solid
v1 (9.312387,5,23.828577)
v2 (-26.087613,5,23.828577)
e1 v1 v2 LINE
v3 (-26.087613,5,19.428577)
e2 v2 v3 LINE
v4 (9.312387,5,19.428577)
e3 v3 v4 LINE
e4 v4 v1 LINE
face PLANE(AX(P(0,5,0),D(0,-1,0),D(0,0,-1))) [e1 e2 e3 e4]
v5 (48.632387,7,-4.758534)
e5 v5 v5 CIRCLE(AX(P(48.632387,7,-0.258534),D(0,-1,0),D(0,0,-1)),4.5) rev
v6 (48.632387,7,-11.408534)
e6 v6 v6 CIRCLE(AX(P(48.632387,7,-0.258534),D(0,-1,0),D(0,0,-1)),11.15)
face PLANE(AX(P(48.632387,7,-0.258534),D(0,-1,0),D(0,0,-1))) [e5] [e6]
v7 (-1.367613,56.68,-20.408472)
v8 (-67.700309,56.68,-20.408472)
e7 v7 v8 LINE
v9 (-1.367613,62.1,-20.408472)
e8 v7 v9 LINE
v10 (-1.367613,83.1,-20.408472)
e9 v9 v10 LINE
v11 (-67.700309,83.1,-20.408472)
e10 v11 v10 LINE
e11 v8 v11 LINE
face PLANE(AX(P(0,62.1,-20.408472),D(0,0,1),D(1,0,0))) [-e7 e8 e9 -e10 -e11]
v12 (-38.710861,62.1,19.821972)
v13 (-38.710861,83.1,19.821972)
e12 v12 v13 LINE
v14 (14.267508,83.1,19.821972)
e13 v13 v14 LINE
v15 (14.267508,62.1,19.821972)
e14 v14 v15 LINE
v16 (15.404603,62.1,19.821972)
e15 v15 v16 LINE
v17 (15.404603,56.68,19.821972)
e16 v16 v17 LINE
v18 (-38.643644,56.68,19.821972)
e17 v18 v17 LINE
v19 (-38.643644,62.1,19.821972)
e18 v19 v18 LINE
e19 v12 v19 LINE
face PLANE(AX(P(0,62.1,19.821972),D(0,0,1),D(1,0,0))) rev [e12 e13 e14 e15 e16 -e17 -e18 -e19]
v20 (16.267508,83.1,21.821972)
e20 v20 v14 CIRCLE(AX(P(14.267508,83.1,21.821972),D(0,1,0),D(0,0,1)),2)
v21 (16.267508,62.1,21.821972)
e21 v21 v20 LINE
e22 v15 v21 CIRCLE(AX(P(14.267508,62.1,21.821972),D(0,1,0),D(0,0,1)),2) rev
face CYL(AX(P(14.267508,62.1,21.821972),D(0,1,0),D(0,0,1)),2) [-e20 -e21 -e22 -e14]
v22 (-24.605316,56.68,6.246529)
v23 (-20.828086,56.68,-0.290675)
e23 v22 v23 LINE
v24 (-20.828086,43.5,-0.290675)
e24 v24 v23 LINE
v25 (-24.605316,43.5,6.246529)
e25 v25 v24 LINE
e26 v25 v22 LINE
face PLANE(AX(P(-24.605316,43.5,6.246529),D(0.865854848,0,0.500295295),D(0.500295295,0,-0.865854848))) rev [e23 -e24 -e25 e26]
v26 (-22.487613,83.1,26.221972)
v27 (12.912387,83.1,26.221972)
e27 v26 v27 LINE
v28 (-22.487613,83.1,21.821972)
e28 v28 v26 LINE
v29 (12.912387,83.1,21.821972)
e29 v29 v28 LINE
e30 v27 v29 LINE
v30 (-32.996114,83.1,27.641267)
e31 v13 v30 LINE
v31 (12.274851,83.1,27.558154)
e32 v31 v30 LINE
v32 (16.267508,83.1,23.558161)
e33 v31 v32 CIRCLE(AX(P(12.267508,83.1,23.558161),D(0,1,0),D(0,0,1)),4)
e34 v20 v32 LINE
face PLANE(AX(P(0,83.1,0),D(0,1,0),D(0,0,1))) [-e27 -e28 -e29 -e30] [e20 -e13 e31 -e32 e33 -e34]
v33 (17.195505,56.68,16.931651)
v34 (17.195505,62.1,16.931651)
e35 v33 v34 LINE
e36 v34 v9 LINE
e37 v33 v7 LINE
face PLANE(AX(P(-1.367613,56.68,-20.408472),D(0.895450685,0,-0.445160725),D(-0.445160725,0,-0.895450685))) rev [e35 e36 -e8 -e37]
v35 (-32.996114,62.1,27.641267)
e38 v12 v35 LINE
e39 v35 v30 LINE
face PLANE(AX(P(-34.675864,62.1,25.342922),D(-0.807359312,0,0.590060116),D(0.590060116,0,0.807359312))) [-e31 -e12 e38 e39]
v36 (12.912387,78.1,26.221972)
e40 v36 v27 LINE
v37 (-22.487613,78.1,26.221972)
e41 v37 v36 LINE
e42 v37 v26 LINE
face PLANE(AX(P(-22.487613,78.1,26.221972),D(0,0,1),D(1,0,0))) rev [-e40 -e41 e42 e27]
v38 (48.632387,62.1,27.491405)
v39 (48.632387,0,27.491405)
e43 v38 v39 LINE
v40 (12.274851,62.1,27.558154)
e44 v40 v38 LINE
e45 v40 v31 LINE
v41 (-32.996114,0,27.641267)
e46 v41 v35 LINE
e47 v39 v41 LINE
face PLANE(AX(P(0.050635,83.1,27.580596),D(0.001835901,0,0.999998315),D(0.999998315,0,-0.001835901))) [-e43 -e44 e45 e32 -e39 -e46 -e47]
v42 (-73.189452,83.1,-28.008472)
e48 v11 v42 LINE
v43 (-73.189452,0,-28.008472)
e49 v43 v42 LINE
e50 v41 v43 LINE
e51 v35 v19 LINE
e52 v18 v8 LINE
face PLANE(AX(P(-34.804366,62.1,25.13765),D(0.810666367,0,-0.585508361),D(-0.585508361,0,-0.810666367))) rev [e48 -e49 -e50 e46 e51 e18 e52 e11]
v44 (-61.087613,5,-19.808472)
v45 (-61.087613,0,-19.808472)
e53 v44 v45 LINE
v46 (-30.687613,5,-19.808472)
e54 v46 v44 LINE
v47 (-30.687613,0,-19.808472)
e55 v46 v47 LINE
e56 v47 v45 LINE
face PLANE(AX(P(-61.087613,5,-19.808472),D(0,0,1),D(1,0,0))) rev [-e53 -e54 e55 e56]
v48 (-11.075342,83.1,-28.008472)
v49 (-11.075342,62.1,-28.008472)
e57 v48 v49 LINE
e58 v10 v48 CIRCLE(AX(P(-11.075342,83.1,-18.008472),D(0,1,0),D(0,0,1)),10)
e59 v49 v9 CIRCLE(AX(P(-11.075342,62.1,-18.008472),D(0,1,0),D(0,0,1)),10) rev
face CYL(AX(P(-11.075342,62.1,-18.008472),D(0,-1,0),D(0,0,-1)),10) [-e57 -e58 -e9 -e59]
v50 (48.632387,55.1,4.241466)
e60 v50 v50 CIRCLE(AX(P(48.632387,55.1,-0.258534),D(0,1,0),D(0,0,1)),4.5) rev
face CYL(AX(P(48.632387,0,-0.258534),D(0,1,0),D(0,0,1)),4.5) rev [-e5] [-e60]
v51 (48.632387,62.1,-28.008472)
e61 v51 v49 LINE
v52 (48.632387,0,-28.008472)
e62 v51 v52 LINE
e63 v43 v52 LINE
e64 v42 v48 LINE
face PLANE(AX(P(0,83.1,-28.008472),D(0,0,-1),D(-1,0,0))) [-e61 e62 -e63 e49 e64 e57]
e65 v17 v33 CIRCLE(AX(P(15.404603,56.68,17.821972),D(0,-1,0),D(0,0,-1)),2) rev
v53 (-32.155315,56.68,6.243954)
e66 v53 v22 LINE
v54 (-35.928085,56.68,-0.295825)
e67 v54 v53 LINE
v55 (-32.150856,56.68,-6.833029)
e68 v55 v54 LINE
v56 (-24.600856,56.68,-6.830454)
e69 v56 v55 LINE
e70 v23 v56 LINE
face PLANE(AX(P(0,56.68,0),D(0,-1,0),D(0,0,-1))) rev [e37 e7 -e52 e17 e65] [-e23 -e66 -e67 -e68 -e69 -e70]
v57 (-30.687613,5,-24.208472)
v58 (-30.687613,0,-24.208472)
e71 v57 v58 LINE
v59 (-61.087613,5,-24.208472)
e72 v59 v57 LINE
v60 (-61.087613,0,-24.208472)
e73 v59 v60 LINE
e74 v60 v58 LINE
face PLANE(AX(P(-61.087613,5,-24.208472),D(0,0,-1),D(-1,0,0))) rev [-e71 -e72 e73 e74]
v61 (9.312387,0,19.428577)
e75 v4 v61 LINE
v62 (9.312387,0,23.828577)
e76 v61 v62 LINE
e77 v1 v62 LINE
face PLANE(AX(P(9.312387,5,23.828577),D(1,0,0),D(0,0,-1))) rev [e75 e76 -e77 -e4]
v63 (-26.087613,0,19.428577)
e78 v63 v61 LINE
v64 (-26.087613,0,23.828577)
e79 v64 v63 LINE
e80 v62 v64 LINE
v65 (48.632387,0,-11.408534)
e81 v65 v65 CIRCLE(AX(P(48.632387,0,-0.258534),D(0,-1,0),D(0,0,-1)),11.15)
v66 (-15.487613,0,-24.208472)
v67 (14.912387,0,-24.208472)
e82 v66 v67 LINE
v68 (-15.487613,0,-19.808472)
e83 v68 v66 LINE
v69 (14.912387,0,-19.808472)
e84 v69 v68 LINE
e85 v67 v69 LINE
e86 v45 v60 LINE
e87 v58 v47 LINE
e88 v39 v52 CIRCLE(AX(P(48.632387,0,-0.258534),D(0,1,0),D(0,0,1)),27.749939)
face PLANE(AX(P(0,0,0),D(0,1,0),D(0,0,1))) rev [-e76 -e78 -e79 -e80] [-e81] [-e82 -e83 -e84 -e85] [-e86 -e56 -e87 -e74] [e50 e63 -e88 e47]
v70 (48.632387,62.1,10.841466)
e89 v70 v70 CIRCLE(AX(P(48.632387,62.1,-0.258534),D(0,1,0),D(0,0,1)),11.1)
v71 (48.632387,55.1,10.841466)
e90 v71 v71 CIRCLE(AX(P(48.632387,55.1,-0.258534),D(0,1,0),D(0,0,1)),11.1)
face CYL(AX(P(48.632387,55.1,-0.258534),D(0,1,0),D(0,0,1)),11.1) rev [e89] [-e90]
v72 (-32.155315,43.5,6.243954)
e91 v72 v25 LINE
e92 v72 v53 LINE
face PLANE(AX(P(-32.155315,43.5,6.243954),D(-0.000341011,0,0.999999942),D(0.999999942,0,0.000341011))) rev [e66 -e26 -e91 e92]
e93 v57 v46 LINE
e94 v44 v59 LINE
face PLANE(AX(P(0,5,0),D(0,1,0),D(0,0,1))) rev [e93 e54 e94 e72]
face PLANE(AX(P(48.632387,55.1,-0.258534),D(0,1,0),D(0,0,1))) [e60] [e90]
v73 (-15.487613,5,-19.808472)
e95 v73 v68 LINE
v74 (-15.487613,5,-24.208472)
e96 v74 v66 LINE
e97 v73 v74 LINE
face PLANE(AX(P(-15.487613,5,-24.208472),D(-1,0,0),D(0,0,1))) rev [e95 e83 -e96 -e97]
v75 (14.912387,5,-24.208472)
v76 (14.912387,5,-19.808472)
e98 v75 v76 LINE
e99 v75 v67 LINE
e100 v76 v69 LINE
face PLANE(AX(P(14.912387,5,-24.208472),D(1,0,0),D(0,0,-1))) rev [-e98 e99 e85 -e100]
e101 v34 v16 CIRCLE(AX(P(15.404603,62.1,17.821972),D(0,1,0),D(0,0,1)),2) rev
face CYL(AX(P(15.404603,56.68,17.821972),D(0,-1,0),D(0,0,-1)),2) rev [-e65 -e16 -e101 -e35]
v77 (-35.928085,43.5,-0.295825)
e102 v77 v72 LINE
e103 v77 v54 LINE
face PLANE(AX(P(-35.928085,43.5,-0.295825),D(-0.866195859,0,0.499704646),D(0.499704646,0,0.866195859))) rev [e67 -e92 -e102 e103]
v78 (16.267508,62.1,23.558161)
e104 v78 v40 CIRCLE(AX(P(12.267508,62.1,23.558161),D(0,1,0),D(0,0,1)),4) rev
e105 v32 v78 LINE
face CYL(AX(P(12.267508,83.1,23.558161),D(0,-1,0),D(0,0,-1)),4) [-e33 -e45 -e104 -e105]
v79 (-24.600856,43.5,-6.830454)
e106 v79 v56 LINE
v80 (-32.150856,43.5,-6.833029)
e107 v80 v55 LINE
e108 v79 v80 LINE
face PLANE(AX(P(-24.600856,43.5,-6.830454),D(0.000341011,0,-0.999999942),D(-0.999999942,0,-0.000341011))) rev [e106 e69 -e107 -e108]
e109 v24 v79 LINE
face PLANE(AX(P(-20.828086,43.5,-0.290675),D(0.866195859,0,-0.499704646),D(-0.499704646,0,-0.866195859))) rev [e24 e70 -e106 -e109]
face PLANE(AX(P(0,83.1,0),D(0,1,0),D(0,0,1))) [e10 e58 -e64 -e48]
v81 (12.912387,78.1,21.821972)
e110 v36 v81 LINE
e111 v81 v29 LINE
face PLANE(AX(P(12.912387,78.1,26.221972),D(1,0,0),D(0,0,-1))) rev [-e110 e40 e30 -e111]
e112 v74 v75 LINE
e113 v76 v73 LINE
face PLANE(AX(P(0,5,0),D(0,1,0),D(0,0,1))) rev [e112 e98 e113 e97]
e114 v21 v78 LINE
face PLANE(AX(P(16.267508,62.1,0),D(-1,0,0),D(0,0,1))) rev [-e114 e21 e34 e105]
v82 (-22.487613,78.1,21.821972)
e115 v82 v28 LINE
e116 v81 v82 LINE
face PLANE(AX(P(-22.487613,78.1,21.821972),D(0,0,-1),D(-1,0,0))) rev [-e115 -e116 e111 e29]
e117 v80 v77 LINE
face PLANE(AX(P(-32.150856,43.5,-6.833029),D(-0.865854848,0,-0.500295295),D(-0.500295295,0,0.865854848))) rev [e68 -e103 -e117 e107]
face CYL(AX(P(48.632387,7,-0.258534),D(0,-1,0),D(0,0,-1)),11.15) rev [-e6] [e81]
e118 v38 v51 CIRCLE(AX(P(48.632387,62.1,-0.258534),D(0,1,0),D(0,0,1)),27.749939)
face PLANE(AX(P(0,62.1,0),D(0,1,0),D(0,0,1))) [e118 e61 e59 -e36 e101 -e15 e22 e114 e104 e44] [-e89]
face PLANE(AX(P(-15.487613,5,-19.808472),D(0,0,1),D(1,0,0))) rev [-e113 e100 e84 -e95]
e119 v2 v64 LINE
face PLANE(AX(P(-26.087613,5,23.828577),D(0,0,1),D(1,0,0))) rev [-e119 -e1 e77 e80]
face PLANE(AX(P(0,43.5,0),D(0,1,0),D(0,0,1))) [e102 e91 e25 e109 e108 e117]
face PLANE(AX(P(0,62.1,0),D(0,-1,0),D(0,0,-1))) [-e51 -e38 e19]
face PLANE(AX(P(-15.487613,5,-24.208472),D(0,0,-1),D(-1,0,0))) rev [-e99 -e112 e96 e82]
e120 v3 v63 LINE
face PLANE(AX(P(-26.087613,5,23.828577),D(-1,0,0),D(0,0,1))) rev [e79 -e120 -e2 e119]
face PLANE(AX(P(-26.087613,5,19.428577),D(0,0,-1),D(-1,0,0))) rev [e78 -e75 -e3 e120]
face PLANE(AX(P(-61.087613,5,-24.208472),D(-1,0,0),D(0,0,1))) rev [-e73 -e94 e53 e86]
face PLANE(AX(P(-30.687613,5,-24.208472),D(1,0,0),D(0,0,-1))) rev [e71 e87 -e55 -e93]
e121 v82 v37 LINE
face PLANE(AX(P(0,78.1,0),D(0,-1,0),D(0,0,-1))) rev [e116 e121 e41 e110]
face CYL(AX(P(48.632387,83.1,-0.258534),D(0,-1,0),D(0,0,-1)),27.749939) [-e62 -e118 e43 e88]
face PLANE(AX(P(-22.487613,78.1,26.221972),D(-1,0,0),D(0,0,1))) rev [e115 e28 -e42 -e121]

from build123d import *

# Parameters (mm, degrees)
EXTRUDE_1_DEPTH      = 83.1
SKETCH_2_W           = 35.4
SKETCH_2_H           = 4.4
SKETCH_2_W_2         = 30.4
CUT_EXTRUDE_1_DEPTH  = 5
SKETCH_3_W           = 35.4
SKETCH_3_H           = 4.4
CUT_EXTRUDE_2_DEPTH  = 5
CUT_EXTRUDE_4_DEPTH  = 21
SKETCH_7_R           = 4.5
CUT_EXTRUDE_5_DEPTH  = 107.120558328
SKETCH_8_R           = 11.1
CUT_EXTRUDE_6_DEPTH  = 7
SKETCH_9_R           = 11.15
CUT_EXTRUDE_7_DEPTH  = 7
CUT_EXTRUDE_8_DEPTH  = 107.120558328
FILLET_1_R           = 10
CUT_EXTRUDE_9_DEPTH  = 18.6
CUT_EXTRUDE_10_DEPTH = 5.42
FILLET_2_R           = 2
FILLET_3_R           = 2
FILLET_4_R           = 4


with BuildPart() as part:
    # Эскиз1 → Бобышка-Вытянуть1 (new body)
    with BuildSketch(Plane(origin=(0, 0, 0), x_dir=(1, 0, 0), z_dir=(0, 1, 0))):
        with BuildLine():
            Line((48.631682576, -27.49140627), (48.632387335, -27.491404976))
            ThreePointArc((48.632387335, -27.491404976), (76.382325871, 0.258533559), (48.632387335, 28.008472095))
            Line((48.632387335, 28.008472095), (-81.367612665, 28.008472095))
            Line((-81.367612665, 28.008472095), (-81.367612665, -27.730072458))
            Line((-81.367612665, -27.730072458), (48.631682576, -27.49140627))
        make_face()
    extrude(amount=EXTRUDE_1_DEPTH)

    # Эскиз2 → Вырез-Вытянуть1 (cut)
    with BuildSketch(Plane(origin=(0, 0, 0), x_dir=(-1, 0, 0), z_dir=(0, -1, 0))):
        with Locations((8.387612665, -21.628577297)):
            Rectangle(SKETCH_2_W, SKETCH_2_H)
        with Locations((45.887612665, 22.008472095)):
            Rectangle(SKETCH_2_W_2, SKETCH_2_H)
        with Locations((0.287612665, 22.008472095)):
            Rectangle(SKETCH_2_W_2, SKETCH_2_H)
    extrude(amount=-CUT_EXTRUDE_1_DEPTH, mode=Mode.SUBTRACT)

    # Эскиз3 → Вырез-Вытянуть2 (cut)
    with BuildSketch(Plane(origin=(0, 83.1, 0), x_dir=(1, 0, 0), z_dir=(0, 1, 0))):
        with Locations((-4.787612665, -24.021972088)):
            Rectangle(SKETCH_3_W, SKETCH_3_H)
    extrude(amount=-CUT_EXTRUDE_2_DEPTH, mode=Mode.SUBTRACT)

    # Эскиз6 → Вырез-Вытянуть4 (cut)
    with BuildSketch(Plane(origin=(0, 83.1, 0), x_dir=(1, 0, 0), z_dir=(0, 1, 0))):
        with BuildLine():
            Line((-38.710860793, -19.821972088), (16.267507788, -19.821972088))
            Line((16.267507788, -19.821972088), (16.267507788, -27.550823779))
            Line((16.267507788, -27.550823779), (37.284075999, -27.512239383))
            ThreePointArc((37.284075999, -27.512239383), (78.632374752, 0.286010542), (37.233224591, 28.008472095))
            Line((37.233224591, 28.008472095), (-1.367612665, 28.008472095))
            Line((-1.367612665, 28.008472095), (-1.367612665, 20.408472095))
            Line((-1.367612665, 20.408472095), (-67.700309337, 20.408472095))
            Line((-67.700309337, 20.408472095), (-73.189452249, 28.008472095))
            Line((-73.189452249, 28.008472095), (-81.367612665, 28.008472095))
            Line((-81.367612665, 28.008472095), (-81.367612665, -27.730072458))
            Line((-81.367612665, -27.730072458), (-32.996113938, -27.641267044))
            Line((-32.996113938, -27.641267044), (-38.710860793, -19.821972088))
        make_face()
    extrude(amount=-CUT_EXTRUDE_4_DEPTH, mode=Mode.SUBTRACT)

    # Эскиз7 → Вырез-Вытянуть5 (cut, through all)
    with BuildSketch(Plane(origin=(0, 62.1, 0), x_dir=(1, 0, 0), z_dir=(0, 1, 0))):
        with Locations(Location((48.632387335, 0.258533559, 0), (0, 0, 270))):
            Circle(SKETCH_7_R)
    extrude(amount=-CUT_EXTRUDE_5_DEPTH, mode=Mode.SUBTRACT)

    # Эскиз8 → Вырез-Вытянуть6 (cut)
    with BuildSketch(Plane(origin=(0, 62.1, 0), x_dir=(1, 0, 0), z_dir=(0, 1, 0))):
        with Locations(Location((48.632387335, 0.258533559, 0), (0, 0, 270))):
            Circle(SKETCH_8_R)
    extrude(amount=-CUT_EXTRUDE_6_DEPTH, mode=Mode.SUBTRACT)

    # Эскиз9 → Вырез-Вытянуть7 (cut)
    with BuildSketch(Plane.XZ):
        with Locations(Location((48.632387335, -0.258533559, 0), (0, 0, 270))):
            Circle(SKETCH_9_R)
    extrude(amount=-CUT_EXTRUDE_7_DEPTH, mode=Mode.SUBTRACT)

    # Эскиз10 → Вырез-Вытянуть8 (cut, through all)
    with BuildSketch(Plane(origin=(0, 62.1, 0), x_dir=(1, 0, 0), z_dir=(0, 1, 0))):
        Polygon((-73.189452249, 28.008472095), (-81.367612665, 28.008472095), (-81.367612665, -27.730072458), (-32.996113938, -27.641267044), align=None)
    extrude(amount=-CUT_EXTRUDE_8_DEPTH, mode=Mode.SUBTRACT)

    # Скругление1
    # the kernel refuses this fillet: 10 mm, written as the material it takes off along each edge
    with BuildSketch(Plane(origin=(-1.367612665, 107.369322199, -28.008472095), x_dir=(0, 0, 1), z_dir=(0, -1, 0))) as fillet_1_piece_1:
        with BuildLine():
            CenterArc((10, 9.70772888), FILLET_1_R, 180, 76.113459637)
            Line((0, 9.70772888), (-0.2, 9.70772888))
            Line((-0.2, 9.70772888), (-0.2, 0))
            Line((-0.2, 0), (0, -0.2))
            ThreePointArc((0, -0.2), (3.8, -0.2), (7.552, -0.194154578))
            Line((7.552, -0.194154578), (7.6, 0))
        make_face()
    extrude(amount=45.269322199, mode=Mode.SUBTRACT)

    # Эскиз11 → Вырез-Вытянуть9 (cut)
    with BuildSketch(Plane(origin=(0, 62.1, 0), x_dir=(1, 0, 0), z_dir=(0, 1, 0))):
        Polygon((-35.9280852, 0.295824639), (-32.155315119, -6.243954097), (-24.605315558, -6.246528733), (-20.828086078, 0.290675368), (-24.600856158, 6.830454104), (-32.150855719, 6.833028739), align=None)
    extrude(amount=-CUT_EXTRUDE_9_DEPTH, mode=Mode.SUBTRACT)

    # Эскиз12 → Вырез-Вытянуть10 (cut)
    with BuildSketch(Plane(origin=(0, 62.1, 0), x_dir=(1, 0, 0), z_dir=(0, 1, 0))):
        Polygon((-1.367612665, 20.408472095), (18.632387335, -19.821972088), (-38.710860793, -19.821972088), (-67.700309337, 20.408472095), align=None)
    extrude(amount=-CUT_EXTRUDE_10_DEPTH, mode=Mode.SUBTRACT)

    # Скругление2
    fillet_2_edges = [part.edges().sort_by_distance(p)[0] for p in [
        (18.632387335, 59.39, 19.821972088),
    ]]
    fillet(fillet_2_edges, radius=FILLET_2_R)

    # Скругление3
    # the kernel refuses this fillet: 2 mm, written as the material it takes off along each edge
    with BuildSketch(Plane(origin=(16.267507788, 88.589321146, 19.62624363), x_dir=(-0.9952454215977946, 0, 0.09739892601373129), z_dir=(0, -1, 0))) as fillet_3_piece_1:
        with BuildLine():
            CenterArc((2.204352437, -1.990490843), FILLET_3_R, 95.589408628, 90)
            Line((0.213861594, -2.185288695), (0.014812509, -2.20476848))
            Line((0.014812509, -2.20476848), (-0.199049084, -0.019479785))
            Line((-0.199049084, -0.019479785), (0.068306766, 0.187973896))
            ThreePointArc((0.068306766, 0.187973896), (0.858385725, 0.088297205), (1.9900748, 0.199049084))
            Line((1.9900748, 0.199049084), (2.009554585, 0))
        make_face()
    extrude(amount=26.489321146, mode=Mode.SUBTRACT)

    # Скругление4
    fillet_4_edges = [part.edges().sort_by_distance(p)[0] for p in [
        (16.267507788, 72.6, 27.550823779),
    ]]
    fillet(fillet_4_edges, radius=FILLET_4_R)


solid = part.part
